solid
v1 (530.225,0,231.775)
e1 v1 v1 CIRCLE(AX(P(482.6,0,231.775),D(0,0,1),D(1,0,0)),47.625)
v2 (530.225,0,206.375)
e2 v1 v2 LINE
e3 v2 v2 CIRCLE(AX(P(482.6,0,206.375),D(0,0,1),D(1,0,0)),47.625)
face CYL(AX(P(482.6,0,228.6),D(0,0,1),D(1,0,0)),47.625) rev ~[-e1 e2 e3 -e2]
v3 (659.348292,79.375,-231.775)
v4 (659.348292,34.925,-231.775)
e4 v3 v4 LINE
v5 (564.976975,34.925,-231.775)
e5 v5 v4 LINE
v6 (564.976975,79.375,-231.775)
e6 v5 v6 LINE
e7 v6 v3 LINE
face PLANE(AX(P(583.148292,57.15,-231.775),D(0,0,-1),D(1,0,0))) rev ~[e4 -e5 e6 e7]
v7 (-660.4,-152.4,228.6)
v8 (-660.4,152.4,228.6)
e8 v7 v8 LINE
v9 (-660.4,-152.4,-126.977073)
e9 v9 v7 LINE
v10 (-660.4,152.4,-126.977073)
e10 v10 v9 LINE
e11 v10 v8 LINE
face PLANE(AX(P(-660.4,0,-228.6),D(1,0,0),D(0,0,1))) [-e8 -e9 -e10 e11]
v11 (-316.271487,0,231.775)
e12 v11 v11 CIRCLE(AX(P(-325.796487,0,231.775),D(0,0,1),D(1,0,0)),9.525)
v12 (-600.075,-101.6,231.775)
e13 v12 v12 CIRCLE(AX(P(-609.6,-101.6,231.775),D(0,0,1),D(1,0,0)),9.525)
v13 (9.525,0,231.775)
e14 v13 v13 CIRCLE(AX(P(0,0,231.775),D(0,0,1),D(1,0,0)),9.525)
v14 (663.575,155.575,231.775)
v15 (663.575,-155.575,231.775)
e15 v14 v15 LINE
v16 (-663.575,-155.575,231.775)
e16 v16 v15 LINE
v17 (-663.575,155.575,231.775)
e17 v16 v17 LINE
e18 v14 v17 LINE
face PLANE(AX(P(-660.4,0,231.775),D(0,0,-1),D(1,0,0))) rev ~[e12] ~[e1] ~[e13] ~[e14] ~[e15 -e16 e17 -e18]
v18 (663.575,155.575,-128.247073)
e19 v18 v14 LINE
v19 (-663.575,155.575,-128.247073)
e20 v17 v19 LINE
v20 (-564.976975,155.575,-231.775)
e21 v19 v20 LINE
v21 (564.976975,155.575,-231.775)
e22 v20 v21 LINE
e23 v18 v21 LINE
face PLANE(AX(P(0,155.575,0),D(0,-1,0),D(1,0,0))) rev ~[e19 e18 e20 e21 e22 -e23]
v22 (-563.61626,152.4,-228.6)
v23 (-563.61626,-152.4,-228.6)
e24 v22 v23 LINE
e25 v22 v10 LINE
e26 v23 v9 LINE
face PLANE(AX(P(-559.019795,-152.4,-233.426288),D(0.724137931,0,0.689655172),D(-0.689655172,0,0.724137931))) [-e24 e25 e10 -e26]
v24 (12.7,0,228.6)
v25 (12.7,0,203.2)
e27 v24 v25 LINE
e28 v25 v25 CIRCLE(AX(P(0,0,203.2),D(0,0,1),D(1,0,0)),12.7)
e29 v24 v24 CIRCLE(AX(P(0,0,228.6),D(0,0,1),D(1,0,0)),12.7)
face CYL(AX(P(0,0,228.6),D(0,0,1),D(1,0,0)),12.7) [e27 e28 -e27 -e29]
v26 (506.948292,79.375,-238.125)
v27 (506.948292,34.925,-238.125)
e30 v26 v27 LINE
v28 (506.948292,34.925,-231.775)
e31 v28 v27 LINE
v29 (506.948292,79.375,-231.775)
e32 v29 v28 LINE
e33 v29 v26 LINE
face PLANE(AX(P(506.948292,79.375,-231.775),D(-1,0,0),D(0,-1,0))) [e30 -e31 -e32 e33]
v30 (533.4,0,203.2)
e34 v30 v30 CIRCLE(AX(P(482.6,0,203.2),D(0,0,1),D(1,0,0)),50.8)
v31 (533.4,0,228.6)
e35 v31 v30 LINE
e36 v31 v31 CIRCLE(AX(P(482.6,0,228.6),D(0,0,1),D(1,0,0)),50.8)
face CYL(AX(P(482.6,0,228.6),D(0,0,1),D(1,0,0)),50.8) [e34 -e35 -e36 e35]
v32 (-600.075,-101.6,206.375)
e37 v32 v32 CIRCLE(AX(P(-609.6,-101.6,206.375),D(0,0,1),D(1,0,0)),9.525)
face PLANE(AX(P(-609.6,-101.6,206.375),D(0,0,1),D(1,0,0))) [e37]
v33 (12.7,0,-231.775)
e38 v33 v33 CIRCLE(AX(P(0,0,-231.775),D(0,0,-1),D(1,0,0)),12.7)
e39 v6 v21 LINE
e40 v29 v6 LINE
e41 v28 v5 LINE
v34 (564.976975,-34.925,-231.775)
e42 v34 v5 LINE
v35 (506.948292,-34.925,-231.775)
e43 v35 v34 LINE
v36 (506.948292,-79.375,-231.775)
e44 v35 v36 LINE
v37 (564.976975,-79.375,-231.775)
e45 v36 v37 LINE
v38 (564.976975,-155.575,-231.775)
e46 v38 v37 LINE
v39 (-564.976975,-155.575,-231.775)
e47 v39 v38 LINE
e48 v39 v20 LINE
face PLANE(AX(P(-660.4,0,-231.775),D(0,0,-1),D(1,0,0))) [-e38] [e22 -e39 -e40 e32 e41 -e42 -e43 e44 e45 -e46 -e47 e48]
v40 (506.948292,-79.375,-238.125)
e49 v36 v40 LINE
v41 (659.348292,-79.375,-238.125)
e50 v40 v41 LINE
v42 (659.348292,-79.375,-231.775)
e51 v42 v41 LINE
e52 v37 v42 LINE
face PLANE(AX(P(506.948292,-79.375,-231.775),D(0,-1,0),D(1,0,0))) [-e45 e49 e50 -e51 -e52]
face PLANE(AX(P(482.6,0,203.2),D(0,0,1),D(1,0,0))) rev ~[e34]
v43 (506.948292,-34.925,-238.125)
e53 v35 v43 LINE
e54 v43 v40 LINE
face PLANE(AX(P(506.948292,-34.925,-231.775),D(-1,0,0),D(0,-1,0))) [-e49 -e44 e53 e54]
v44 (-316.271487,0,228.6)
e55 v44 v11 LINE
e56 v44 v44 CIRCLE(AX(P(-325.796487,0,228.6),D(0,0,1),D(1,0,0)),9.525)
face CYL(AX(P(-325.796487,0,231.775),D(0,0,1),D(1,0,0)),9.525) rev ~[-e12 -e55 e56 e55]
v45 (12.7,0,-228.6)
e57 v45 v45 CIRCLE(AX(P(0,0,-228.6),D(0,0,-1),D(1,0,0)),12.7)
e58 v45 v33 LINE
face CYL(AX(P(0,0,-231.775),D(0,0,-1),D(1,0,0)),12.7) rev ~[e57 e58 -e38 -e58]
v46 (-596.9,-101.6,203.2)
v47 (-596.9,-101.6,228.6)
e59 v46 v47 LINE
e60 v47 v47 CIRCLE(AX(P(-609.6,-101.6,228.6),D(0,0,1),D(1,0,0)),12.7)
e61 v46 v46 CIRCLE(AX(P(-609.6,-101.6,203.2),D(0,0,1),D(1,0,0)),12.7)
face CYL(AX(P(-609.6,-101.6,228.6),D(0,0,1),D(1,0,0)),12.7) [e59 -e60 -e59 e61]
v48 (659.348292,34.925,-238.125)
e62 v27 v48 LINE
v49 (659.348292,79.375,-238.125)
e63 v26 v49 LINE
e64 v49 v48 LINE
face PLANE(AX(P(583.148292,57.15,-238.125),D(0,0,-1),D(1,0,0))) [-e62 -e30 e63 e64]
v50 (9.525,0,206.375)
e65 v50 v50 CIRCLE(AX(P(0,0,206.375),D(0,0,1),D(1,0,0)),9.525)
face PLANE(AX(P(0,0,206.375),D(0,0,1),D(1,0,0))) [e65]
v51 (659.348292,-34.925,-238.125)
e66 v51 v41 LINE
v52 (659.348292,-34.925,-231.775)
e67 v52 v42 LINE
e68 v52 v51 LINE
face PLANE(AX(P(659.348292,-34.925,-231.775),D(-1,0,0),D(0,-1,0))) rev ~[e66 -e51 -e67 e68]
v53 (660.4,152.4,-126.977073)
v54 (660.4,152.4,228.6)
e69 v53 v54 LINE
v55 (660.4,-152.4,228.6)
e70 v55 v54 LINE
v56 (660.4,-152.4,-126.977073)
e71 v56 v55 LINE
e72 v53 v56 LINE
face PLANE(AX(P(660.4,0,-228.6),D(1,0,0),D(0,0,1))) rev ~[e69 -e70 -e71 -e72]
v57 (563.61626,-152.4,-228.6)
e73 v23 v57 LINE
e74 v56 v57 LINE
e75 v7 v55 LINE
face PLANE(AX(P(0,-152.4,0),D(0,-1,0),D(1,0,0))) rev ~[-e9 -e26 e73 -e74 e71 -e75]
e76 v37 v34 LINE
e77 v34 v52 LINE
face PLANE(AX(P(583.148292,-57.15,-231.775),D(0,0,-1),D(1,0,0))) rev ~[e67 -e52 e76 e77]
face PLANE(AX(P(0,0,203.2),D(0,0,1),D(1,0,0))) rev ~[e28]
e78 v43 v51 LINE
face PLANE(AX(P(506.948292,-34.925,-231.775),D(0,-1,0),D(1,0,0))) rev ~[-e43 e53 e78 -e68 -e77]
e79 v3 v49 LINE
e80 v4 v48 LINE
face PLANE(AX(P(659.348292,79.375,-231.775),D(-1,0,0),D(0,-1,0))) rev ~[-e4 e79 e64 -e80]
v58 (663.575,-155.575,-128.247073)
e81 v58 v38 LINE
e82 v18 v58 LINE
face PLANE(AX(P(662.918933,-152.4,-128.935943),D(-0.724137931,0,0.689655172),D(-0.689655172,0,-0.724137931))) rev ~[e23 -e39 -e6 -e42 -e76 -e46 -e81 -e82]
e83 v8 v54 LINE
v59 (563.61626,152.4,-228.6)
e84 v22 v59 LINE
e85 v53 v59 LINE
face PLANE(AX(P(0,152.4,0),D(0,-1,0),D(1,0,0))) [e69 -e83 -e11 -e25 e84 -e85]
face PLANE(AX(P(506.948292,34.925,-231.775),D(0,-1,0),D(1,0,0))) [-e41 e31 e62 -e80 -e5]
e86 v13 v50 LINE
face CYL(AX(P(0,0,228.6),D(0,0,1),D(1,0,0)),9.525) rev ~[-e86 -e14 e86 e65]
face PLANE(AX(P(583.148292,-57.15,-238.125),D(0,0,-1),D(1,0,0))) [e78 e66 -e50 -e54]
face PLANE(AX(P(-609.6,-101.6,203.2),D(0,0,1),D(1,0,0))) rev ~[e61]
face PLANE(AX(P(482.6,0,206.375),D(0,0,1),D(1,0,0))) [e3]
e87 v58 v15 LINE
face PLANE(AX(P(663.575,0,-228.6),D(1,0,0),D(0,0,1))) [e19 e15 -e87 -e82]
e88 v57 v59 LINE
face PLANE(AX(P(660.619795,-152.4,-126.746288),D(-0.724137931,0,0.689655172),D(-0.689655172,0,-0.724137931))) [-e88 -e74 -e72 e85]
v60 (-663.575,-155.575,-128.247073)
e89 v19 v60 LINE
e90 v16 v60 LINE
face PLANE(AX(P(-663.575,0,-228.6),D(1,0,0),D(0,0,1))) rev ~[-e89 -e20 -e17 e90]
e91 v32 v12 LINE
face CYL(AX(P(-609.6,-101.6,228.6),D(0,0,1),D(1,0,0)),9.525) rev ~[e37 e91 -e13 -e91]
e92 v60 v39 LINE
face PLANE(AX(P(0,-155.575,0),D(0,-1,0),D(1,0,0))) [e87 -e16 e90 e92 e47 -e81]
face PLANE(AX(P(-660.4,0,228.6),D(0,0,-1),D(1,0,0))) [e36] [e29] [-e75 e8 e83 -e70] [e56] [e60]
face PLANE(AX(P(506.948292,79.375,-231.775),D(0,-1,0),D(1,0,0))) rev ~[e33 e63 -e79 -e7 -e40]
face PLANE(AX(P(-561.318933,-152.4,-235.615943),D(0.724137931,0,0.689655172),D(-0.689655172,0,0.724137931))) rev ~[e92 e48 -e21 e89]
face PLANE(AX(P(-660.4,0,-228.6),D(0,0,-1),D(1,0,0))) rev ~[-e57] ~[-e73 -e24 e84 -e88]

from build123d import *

# Parameters (mm, degrees)
F0_W      = 1320.8
F0_H      = 457.2
F1_DEPTH  = 152.4
F2_R      = 50.8
F2_R_2    = 12.7
F3_DEPTH  = 25.4
F6_DEPTH  = 304.8
F7_T      = 3.175
F8_W      = 152.4
F8_H      = 44.45
F9_DEPTH  = 6.35
F11_R     = 9.525
F12_DEPTH = 12.7
F10_R     = 12.7
F13_DEPTH = 12.7


with BuildPart() as f1:
    # F0 (on Front) → F1 (new body, symmetric)
    with BuildSketch(Plane.XZ):
        Rectangle(F0_W, F0_H)
    extrude(amount=F1_DEPTH, both=True)

    # F2 (on face) → F3 (cut, symmetric)
    with BuildSketch(Plane.XY.offset(228.6)):
        with Locations((482.6, 0)):
            Circle(F2_R)
        Circle(F2_R_2)
        with Locations((-609.6, -101.6)):
            Circle(F2_R_2)
    extrude(amount=F3_DEPTH, both=True, mode=Mode.SUBTRACT)

    # F5 (on face) → F6 (cut, through all)
    with BuildSketch(Plane.XZ.offset(152.4)):
        Polygon((-559.0197953224, -233.4262882042), (-660.6197953224, -126.7462882042), (-660.6197953224, -233.4262882042), align=None)
        Polygon((660.6197953224, -126.7462882042), (559.0197953224, -233.4262882042), (660.6197953224, -233.4262882042), align=None)
    extrude(amount=-F6_DEPTH, mode=Mode.SUBTRACT)

    # F7 (hollow, outwards: the wall grows on the outside; the body as it was is the cavity)
    f7_inside = f1.part
    offset(amount=F7_T, kind=Kind.INTERSECTION)
    add(f7_inside, mode=Mode.SUBTRACT)

    # F8 (on face) → F9 (join)
    with BuildSketch(Plane(origin=(0, 0, -231.775), x_dir=(1, 0, 0), z_dir=(0, 0, -1))):
        with Locations((583.1482922554, -57.15)):
            Rectangle(F8_W, F8_H)
        with Locations((583.1482922554, 57.15)):
            Rectangle(F8_W, F8_H)
    extrude(amount=F9_DEPTH)

    # F11 (on face) → F12 (cut, symmetric)
    with BuildSketch(Plane.XY.offset(231.775)):
        with Locations((-325.7964868545, 0)):
            Circle(F11_R)
    extrude(amount=F12_DEPTH, both=True, mode=Mode.SUBTRACT)

    # F10 (on face) → F13 (cut, symmetric)
    with BuildSketch(Plane(origin=(0, 0, -231.775), x_dir=(1, 0, 0), z_dir=(0, 0, -1))):
        Circle(F10_R)
    extrude(amount=F13_DEPTH, both=True, mode=Mode.SUBTRACT)


solid = f1.part
